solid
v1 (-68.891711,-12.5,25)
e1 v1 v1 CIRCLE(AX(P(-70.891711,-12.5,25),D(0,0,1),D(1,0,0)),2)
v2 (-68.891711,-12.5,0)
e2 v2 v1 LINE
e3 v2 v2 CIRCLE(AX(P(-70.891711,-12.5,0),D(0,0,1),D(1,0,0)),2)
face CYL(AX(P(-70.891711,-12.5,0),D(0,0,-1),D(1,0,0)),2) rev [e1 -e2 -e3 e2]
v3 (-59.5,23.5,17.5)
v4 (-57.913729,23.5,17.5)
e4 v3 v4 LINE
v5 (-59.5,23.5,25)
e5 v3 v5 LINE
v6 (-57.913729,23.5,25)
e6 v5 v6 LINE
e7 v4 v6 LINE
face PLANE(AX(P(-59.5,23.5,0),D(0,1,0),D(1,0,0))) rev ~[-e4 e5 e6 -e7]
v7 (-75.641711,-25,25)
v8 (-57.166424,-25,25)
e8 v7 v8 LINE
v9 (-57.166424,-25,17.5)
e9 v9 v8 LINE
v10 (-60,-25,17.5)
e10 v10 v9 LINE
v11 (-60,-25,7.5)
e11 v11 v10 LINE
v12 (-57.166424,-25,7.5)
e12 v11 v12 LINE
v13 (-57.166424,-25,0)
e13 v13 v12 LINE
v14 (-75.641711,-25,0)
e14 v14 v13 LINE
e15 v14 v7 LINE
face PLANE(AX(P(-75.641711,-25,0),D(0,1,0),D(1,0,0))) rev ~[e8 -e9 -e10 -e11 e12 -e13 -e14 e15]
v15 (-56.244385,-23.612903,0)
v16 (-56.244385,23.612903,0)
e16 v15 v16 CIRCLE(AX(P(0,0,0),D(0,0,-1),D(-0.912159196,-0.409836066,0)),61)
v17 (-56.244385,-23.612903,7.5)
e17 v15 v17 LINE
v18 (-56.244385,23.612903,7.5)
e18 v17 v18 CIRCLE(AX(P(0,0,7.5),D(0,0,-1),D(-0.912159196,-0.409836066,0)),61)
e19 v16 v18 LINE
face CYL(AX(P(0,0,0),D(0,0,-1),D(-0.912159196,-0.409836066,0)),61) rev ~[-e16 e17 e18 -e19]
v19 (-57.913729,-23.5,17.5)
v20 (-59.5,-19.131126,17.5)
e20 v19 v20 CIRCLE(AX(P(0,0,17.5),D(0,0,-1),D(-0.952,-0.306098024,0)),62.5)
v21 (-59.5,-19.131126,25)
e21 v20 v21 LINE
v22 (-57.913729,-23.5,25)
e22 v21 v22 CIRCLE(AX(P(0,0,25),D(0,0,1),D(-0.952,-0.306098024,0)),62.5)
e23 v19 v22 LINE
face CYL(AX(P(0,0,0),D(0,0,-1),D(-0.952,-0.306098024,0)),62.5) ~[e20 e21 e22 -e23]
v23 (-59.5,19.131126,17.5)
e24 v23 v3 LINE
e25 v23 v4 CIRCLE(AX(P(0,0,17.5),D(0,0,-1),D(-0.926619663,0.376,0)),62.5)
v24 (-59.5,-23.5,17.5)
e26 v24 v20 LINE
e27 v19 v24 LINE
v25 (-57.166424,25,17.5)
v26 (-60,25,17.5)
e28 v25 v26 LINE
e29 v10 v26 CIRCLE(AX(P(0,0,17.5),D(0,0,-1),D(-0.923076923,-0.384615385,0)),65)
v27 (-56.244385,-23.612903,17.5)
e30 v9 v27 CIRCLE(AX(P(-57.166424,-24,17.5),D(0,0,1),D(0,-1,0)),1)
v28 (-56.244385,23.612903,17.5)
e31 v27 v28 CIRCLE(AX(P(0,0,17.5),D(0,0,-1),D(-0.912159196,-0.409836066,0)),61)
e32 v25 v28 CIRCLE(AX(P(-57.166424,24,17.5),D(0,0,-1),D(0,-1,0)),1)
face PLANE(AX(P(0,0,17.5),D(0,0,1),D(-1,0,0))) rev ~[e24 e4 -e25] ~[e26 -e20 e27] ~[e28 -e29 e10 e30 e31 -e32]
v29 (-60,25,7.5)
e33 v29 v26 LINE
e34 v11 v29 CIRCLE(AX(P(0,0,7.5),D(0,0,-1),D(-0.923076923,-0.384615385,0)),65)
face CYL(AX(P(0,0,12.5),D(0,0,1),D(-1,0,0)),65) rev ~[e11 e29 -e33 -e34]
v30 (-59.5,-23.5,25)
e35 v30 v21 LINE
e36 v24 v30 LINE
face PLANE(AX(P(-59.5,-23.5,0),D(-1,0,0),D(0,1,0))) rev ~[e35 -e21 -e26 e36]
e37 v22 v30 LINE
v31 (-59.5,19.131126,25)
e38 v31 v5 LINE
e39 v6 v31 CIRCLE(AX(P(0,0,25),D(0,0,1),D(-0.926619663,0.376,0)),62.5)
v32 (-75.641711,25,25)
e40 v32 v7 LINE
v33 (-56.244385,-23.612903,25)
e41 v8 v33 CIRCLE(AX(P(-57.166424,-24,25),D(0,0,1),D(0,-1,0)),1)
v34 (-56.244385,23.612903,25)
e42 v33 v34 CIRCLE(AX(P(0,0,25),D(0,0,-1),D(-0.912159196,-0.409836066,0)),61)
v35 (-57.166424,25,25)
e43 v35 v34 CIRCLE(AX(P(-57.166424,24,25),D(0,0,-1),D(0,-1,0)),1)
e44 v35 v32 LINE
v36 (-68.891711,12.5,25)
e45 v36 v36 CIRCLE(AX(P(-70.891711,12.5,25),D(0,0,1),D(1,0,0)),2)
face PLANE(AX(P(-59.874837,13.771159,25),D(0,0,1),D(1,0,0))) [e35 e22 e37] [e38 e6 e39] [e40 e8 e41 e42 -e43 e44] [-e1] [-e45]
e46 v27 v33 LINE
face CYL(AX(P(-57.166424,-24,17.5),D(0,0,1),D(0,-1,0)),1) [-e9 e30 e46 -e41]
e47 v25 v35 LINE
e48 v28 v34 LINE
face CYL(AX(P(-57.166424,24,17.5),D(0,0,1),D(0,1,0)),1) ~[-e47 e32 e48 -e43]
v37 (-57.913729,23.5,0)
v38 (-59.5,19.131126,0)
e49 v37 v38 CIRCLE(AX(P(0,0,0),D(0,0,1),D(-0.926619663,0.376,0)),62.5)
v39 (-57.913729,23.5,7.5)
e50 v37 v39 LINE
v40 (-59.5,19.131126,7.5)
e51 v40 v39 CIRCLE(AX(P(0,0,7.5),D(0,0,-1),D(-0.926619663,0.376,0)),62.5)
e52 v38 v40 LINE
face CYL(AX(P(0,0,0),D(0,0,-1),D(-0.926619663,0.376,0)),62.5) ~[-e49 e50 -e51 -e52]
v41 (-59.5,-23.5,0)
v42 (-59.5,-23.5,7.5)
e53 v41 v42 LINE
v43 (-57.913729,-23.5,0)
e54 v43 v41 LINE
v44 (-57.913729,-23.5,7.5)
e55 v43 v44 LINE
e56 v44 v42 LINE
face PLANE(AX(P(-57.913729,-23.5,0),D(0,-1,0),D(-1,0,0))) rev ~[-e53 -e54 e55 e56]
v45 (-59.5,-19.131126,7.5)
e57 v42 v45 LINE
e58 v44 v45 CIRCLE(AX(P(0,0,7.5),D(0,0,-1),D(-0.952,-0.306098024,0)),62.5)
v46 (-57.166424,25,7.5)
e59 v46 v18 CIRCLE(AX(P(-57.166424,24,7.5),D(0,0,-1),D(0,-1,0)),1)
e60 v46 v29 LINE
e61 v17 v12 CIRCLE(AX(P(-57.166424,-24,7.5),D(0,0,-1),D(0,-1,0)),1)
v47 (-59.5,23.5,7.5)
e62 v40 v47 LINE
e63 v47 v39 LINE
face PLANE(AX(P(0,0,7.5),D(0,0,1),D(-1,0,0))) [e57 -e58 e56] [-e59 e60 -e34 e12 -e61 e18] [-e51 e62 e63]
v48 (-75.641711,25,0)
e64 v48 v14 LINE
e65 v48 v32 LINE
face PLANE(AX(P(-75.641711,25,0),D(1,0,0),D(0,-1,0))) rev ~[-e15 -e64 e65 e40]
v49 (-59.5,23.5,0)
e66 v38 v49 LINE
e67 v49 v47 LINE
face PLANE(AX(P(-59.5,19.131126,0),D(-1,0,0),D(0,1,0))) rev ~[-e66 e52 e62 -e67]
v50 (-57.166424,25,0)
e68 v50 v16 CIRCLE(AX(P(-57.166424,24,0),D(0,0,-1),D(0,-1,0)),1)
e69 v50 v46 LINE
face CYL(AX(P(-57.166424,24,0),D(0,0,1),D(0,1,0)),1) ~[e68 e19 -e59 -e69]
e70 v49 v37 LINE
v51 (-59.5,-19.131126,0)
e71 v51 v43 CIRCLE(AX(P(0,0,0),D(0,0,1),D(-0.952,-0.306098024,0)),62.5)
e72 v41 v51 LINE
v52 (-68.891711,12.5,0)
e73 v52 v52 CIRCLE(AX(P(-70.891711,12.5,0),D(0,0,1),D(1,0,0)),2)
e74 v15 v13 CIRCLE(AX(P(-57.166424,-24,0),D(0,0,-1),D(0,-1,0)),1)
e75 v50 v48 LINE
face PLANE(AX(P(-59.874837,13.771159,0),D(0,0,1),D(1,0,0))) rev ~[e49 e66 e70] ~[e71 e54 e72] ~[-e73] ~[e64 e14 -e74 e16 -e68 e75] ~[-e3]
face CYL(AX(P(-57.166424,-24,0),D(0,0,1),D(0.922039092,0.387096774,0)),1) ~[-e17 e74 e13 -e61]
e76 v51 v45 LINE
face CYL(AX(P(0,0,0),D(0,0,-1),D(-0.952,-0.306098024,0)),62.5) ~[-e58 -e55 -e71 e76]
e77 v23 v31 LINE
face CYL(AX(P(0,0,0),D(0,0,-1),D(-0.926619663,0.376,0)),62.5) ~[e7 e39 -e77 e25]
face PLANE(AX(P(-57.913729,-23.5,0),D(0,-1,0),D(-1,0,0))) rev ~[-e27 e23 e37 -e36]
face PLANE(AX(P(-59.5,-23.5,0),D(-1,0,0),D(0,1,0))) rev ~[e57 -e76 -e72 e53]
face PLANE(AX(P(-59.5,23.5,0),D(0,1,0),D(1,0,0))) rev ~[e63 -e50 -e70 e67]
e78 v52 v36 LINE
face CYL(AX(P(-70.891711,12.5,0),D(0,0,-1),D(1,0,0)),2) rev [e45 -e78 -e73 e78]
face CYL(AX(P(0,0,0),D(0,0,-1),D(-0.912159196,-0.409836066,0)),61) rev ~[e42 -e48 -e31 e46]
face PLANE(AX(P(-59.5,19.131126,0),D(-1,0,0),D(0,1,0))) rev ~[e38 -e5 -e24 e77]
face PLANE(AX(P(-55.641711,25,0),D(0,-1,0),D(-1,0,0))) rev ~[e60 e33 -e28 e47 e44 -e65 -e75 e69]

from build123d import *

# Parameters (mm, degrees)
F0_W     = 14.641710973
F0_H     = 25
F0_R     = 2
F2_DEPTH = 25
F1_W     = 8
F1_H     = 10
F4_R     = 1


# Not quite as in the source:
# - a feature names something its author has since deleted; it is built from what else it names


with BuildPart() as f2:
    # F0 (on Top) → F2 (new body)
    with BuildSketch(Plane.XY):
        with BuildLine():
            ThreePointArc((-61, 0), (-59.6453869522, 12.7838888967), (-55.641710973, 25))
            Line((-55.641710973, 25), (-61, 25))
            Line((-61, 25), (-61, 0))
        make_face()
        with BuildLine():
            Line((-59.5, 19.1311264697), (-59.5, 23.5))
            Line((-59.5, 23.5), (-57.9137289423, 23.5))
            ThreePointArc((-57.9137289423, 23.5), (-58.7474910104, 21.3303141089), (-59.5, 19.1311264697))
        make_face(mode=Mode.SUBTRACT)
        with BuildLine():
            ThreePointArc((-55.641710973, -25), (-59.6453869522, -12.7838888967), (-61, 0))
            Line((-61, 0), (-61, -25))
            Line((-61, -25), (-55.641710973, -25))
        make_face()
        with BuildLine():
            Line((-57.9137289423, -23.5), (-59.5, -23.5))
            Line((-59.5, -23.5), (-59.5, -19.1311264697))
            ThreePointArc((-59.5, -19.1311264697), (-58.7474910104, -21.3303141089), (-57.9137289423, -23.5))
        make_face(mode=Mode.SUBTRACT)
        with Locations((-68.3208554865, -12.5)):
            Rectangle(F0_W, F0_H)
        with Locations((-70.891710973, -12.5)):
            Circle(F0_R, mode=Mode.SUBTRACT)
        with Locations((-68.3208554865, 12.5)):
            Rectangle(F0_W, F0_H)
        with Locations((-70.891710973, 12.5)):
            Circle(F0_R, mode=Mode.SUBTRACT)
    extrude(amount=F2_DEPTH)

    # F1 (on Front) → F3 (revolve, cut)
    with BuildSketch(Plane.XZ):
        with Locations((-61, 12.5)):
            Rectangle(F1_W, F1_H)
    revolve(axis=Axis((0, 0, 15.2043728158), (0, 0, 1)), mode=Mode.SUBTRACT)

    # F4
    f4_edges = [f2.edges().sort_by_distance(p)[0] for p in [
        (-55.641711, 25, 21.25),
        (-55.641711, 25, 3.75),
        (-55.641711, -25, 3.75),
        (-55.641711, -25, 21.25),
    ]]
    fillet(f4_edges, radius=F4_R)


solid = f2.part
